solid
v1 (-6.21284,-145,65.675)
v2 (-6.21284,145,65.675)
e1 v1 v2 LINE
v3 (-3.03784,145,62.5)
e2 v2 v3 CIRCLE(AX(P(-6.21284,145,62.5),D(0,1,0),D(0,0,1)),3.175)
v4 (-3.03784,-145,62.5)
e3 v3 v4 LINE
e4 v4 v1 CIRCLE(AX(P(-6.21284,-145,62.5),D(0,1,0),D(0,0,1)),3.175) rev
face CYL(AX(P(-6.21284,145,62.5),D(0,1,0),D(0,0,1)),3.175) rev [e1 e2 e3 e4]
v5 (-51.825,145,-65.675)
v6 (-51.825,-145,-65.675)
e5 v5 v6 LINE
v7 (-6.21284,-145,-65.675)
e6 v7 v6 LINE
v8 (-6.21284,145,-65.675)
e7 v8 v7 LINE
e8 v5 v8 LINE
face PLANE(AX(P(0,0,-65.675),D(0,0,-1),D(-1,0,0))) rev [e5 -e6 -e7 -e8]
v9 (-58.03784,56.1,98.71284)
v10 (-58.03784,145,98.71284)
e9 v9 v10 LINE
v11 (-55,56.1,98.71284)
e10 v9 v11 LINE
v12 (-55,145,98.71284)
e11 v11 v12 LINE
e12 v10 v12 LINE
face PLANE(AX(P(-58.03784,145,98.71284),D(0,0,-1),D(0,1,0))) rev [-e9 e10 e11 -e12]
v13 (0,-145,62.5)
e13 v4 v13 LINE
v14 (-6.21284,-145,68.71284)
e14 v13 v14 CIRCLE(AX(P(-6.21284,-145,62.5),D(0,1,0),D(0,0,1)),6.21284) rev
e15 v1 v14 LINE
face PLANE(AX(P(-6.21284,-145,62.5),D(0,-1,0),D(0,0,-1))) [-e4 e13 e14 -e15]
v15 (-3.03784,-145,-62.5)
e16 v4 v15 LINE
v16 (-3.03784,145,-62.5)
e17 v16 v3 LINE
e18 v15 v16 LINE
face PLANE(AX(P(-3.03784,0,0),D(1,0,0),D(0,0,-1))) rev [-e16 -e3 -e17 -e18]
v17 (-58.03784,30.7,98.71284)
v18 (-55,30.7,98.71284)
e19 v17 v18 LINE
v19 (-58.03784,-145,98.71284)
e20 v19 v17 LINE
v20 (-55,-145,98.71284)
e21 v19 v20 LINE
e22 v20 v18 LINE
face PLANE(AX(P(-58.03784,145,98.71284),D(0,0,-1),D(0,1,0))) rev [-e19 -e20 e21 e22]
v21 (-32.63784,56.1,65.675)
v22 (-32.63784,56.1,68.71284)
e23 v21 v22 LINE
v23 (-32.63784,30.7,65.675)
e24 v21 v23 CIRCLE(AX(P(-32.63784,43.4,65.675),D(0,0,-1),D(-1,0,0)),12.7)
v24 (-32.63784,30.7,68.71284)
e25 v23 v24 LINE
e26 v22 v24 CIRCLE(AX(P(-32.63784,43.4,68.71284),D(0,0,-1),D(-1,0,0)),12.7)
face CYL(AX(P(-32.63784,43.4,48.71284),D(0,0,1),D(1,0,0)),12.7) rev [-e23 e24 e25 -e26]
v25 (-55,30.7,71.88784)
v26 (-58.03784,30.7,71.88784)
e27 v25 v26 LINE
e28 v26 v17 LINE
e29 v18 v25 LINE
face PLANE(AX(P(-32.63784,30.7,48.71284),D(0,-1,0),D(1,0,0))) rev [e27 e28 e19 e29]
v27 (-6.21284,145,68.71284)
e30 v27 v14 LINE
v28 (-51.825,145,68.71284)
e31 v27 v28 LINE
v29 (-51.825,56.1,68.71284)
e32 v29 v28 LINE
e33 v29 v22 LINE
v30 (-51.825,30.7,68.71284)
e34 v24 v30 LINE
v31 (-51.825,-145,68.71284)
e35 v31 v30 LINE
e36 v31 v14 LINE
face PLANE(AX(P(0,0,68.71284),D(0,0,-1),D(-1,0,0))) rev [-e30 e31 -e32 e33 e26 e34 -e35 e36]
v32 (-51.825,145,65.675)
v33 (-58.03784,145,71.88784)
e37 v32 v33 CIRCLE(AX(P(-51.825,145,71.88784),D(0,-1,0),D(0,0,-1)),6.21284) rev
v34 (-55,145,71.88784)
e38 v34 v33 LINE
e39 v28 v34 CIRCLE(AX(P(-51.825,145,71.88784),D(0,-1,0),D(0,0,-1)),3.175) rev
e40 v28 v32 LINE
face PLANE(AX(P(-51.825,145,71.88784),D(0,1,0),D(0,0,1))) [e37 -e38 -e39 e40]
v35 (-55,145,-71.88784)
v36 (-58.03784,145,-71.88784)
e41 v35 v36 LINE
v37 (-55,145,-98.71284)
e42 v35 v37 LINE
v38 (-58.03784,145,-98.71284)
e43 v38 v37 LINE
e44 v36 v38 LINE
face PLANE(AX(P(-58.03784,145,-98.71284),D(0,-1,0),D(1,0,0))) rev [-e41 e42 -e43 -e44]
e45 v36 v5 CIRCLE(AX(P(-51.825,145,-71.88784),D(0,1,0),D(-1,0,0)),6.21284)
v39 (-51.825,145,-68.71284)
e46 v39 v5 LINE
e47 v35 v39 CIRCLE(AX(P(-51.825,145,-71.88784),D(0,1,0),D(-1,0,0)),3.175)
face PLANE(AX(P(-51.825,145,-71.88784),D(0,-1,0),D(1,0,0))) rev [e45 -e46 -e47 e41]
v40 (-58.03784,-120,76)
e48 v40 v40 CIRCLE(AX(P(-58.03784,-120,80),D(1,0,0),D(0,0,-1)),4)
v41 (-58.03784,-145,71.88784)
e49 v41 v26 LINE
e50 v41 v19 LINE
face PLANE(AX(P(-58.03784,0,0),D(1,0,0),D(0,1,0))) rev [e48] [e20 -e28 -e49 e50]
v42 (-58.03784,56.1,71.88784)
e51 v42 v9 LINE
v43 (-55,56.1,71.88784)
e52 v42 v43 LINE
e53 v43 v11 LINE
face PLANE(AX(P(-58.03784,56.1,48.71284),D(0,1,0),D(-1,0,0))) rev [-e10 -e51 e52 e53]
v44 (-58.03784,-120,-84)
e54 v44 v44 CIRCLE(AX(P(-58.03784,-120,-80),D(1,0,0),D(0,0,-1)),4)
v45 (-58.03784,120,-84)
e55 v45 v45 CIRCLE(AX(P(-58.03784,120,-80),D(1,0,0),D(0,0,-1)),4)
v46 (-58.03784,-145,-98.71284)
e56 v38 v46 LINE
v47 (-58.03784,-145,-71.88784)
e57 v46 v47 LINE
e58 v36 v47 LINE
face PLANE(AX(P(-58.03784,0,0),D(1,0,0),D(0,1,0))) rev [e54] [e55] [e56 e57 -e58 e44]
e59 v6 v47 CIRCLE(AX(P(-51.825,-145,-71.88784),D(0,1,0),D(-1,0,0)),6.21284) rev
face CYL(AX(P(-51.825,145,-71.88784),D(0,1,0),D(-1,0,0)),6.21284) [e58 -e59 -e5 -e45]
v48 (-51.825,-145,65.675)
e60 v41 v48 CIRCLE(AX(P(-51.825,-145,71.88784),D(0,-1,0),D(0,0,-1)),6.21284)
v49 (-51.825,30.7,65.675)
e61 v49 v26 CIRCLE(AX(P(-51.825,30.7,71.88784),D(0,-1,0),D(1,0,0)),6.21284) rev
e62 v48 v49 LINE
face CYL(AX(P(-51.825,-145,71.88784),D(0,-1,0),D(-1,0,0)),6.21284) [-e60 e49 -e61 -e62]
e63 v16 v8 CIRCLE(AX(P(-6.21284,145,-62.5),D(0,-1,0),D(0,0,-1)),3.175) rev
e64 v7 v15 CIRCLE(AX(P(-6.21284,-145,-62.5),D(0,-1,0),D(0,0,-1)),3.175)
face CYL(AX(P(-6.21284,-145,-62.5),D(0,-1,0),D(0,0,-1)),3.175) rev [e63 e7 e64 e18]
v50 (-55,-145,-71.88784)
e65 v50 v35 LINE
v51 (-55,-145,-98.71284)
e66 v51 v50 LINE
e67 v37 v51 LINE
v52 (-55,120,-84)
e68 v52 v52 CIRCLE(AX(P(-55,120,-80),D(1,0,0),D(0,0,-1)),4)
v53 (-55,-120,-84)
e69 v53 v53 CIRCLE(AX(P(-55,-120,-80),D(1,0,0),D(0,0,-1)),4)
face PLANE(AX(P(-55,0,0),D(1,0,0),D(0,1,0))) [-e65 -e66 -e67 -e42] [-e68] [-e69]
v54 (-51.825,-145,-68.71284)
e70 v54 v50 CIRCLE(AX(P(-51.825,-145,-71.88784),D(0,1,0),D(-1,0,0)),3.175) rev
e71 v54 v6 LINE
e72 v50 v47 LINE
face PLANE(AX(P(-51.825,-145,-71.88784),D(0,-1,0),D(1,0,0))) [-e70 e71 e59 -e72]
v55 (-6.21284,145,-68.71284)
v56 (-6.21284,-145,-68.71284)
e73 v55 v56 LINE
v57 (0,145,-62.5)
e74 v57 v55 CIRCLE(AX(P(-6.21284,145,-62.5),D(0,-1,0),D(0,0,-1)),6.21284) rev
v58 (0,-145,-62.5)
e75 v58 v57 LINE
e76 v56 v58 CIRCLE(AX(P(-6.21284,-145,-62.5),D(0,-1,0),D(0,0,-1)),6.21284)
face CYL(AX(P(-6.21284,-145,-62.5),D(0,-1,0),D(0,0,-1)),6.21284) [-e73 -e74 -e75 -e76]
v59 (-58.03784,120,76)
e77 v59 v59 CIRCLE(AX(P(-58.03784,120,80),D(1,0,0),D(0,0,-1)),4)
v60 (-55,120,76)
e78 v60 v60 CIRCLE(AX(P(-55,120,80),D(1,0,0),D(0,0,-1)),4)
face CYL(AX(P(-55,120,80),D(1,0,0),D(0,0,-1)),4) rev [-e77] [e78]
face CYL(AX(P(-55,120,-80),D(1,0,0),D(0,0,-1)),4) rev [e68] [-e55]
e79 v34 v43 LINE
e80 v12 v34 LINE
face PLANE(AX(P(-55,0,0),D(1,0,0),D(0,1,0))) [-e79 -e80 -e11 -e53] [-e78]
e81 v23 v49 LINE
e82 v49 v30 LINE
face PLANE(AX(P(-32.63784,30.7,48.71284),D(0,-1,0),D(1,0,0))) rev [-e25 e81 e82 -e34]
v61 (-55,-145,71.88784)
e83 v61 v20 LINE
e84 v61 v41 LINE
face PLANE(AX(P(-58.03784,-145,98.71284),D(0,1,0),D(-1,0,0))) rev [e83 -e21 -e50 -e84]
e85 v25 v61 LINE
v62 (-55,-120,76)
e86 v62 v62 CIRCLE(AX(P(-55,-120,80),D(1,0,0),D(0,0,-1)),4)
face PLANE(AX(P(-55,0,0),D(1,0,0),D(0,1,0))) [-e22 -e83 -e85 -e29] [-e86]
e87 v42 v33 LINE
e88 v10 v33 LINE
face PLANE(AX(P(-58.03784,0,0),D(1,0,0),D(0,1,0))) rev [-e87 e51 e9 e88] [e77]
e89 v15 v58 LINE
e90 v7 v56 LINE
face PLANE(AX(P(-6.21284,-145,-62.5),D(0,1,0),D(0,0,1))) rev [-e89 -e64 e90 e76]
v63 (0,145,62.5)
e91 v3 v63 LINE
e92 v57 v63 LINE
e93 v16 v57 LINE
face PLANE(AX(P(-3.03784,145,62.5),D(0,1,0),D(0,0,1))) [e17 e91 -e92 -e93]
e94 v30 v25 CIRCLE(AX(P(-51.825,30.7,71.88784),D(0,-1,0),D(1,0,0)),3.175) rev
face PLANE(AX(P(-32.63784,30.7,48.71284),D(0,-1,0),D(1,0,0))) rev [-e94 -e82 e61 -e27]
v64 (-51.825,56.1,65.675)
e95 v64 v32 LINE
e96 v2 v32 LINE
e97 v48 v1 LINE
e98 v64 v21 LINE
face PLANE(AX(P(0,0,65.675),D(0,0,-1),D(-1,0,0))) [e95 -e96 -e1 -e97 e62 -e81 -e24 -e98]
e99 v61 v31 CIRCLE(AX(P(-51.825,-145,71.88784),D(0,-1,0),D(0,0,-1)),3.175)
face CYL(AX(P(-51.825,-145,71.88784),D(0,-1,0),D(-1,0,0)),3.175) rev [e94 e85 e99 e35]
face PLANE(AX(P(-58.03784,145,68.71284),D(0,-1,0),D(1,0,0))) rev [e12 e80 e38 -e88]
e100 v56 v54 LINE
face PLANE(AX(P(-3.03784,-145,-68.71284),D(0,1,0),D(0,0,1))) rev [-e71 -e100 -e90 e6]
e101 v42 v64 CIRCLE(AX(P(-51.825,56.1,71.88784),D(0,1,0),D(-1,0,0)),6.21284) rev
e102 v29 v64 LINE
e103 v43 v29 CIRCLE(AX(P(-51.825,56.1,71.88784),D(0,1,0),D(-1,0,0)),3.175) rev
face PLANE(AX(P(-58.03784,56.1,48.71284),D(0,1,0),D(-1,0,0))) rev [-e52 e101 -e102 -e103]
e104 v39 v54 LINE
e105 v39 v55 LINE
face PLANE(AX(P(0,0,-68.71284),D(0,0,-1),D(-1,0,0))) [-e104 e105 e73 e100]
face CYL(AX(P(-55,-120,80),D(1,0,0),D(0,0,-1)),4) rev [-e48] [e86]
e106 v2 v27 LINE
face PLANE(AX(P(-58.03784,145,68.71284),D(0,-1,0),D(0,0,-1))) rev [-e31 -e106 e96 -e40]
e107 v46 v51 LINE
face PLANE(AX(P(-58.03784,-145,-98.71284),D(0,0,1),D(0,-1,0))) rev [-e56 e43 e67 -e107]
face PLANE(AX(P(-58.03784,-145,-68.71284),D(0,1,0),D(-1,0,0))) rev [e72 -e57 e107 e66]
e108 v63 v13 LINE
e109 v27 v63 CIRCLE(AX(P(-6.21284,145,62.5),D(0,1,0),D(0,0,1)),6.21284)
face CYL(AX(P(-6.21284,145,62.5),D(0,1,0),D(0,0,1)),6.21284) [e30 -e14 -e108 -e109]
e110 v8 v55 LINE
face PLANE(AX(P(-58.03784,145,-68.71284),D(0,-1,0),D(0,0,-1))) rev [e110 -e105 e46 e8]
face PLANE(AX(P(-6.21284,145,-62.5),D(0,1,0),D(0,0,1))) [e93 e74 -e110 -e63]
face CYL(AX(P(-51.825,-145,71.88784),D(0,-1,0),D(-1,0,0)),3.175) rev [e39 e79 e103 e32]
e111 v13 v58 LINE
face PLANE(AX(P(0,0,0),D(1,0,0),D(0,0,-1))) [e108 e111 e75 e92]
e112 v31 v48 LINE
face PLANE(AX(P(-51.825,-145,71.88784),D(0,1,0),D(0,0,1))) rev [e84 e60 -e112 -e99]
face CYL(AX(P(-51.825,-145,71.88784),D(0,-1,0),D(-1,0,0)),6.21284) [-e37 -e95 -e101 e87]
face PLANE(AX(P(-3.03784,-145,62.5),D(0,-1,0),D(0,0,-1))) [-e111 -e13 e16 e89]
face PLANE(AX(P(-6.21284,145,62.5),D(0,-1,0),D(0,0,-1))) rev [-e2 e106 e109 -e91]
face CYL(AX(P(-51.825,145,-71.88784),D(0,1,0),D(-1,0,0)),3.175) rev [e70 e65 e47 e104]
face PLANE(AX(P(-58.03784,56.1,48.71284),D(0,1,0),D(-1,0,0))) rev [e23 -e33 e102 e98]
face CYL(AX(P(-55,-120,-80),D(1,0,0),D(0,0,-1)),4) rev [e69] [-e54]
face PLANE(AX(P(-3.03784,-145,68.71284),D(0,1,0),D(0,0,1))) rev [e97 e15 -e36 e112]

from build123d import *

# Parameters (mm, degrees)
SKETCH1_W                      = 125
SKETCH1_H                      = 290
BASE_FLANGE1_DEPTH             = 3.03784
EDGE_FLANGE1_DEPTH             = 290
EDGE_FLANGE1_BEND_DEPTH        = 290
EDGE_FLANGE2_STRIP_W           = 18.50136
EDGE_FLANGE2_STRIP_H           = 3.03784
EDGE_FLANGE2_STRIP_CUT_DEPTH   = 290
EDGE_FLANGE2_STRIP_2_W         = 18.50136
EDGE_FLANGE2_STRIP_2_H         = 3.03784
EDGE_FLANGE2_STRIP_CUT_2_DEPTH = 290
EDGE_FLANGE2_DEPTH             = 290
EDGE_FLANGE2_BEND_DEPTH        = 290
M6_CLEARANCE_HOLE1_D           = 8
CUT_EXTRUDE1_DEPTH             = 50


# Sheet-metal steps are written as plain solids
with BuildPart() as part:
    # Sketch1 → Base-Flange1 (new body)
    with BuildSketch(Plane(origin=(0, 0, 0), x_dir=(0, 0, -1), z_dir=(1, 0, 0))):
        Rectangle(SKETCH1_W, SKETCH1_H)
    extrude(amount=-BASE_FLANGE1_DEPTH)

    # Edge-Flange1 section (across the edge) → Edge-Flange1 (add)
    with BuildSketch(Plane(origin=(-3.03784, -145, 65.675), x_dir=(0, 0, -1), z_dir=(0, 1, 0))):
        with BuildLine():
            Line((-3.03784, 3.175), (-3.03784, 55))
            Line((-3.03784, 55), (0, 55))
            Line((0, 55), (0, 3.175))
            ThreePointArc((0, 3.175), (0.92993597, 0.92993597), (3.175, 0))
            Line((3.175, 0), (3.175, -3.03784))
            ThreePointArc((3.175, -3.03784), (-1.218141294, -1.218141294), (-3.03784, 3.175))
        make_face()
    extrude(amount=EDGE_FLANGE1_DEPTH)

    # Edge-Flange1 section 2 (across the edge) → Edge-Flange1 bend (add)
    with BuildSketch(Plane(origin=(-3.03784, 145, -65.675), x_dir=(0, 0, 1), z_dir=(0, -1, 0))):
        with BuildLine():
            Line((-3.03784, 3.175), (-3.03784, 55))
            Line((-3.03784, 55), (0, 55))
            Line((0, 55), (0, 3.175))
            ThreePointArc((0, 3.175), (0.92993597, 0.92993597), (3.175, 0))
            Line((3.175, 0), (3.175, -3.03784))
            ThreePointArc((3.175, -3.03784), (-1.218141294, -1.218141294), (-3.03784, 3.175))
        make_face()
    extrude(amount=EDGE_FLANGE1_BEND_DEPTH)

    # Edge-Flange2 strip (across the edge) → Edge-Flange2 strip cut (cut)
    with BuildSketch(Plane(origin=(-58.03784, -145, -68.71284), x_dir=(1, 0, 0), z_dir=(0, 1, 0))):
        with Locations((-3.03784, -1.51892)):
            Rectangle(EDGE_FLANGE2_STRIP_W, EDGE_FLANGE2_STRIP_H)
    extrude(amount=EDGE_FLANGE2_STRIP_CUT_DEPTH, mode=Mode.SUBTRACT)

    # Edge-Flange2 strip 2 (across the edge) → Edge-Flange2 strip cut 2 (cut)
    with BuildSketch(Plane(origin=(-58.03784, 145, 68.71284), x_dir=(1, 0, 0), z_dir=(0, -1, 0))):
        with Locations((-3.03784, -1.51892)):
            Rectangle(EDGE_FLANGE2_STRIP_2_W, EDGE_FLANGE2_STRIP_2_H)
    extrude(amount=EDGE_FLANGE2_STRIP_CUT_2_DEPTH, mode=Mode.SUBTRACT)

    # Edge-Flange2 section (across the edge) → Edge-Flange2 (add)
    with BuildSketch(Plane(origin=(-58.03784, -145, -68.71284), x_dir=(1, 0, 0), z_dir=(0, 1, 0))):
        with BuildLine():
            Line((0, 3.175), (0, 30))
            Line((0, 30), (3.03784, 30))
            Line((3.03784, 30), (3.03784, 3.175))
            ThreePointArc((3.03784, 3.175), (3.96777597, 0.92993597), (6.21284, 0))
            Line((6.21284, 0), (6.21284, -3.03784))
            ThreePointArc((6.21284, -3.03784), (1.819698706, -1.218141294), (0, 3.175))
        make_face()
    extrude(amount=EDGE_FLANGE2_DEPTH)

    # Edge-Flange2 section 2 (across the edge) → Edge-Flange2 bend (add)
    with BuildSketch(Plane(origin=(-58.03784, 145, 68.71284), x_dir=(1, 0, 0), z_dir=(0, -1, 0))):
        with BuildLine():
            Line((0, 3.175), (0, 30))
            Line((0, 30), (3.03784, 30))
            Line((3.03784, 30), (3.03784, 3.175))
            ThreePointArc((3.03784, 3.175), (3.96777597, 0.92993597), (6.21284, 0))
            Line((6.21284, 0), (6.21284, -3.03784))
            ThreePointArc((6.21284, -3.03784), (1.819698706, -1.218141294), (0, 3.175))
        make_face()
    extrude(amount=EDGE_FLANGE2_BEND_DEPTH)

    # M6 Clearance Hole1 (through all)
    with Locations(Plane(origin=(-55, 0, 0), x_dir=(0, 0, -1), z_dir=(1, 0, 0))):
        with Locations((-80, 120), (80, 120), (80, -120), (-80, -120)):
            Hole(M6_CLEARANCE_HOLE1_D / 2)

    # Sketch20 → Cut-Extrude1 (cut)
    with BuildSketch(Plane.XY.offset(98.71284)):
        with BuildLine():
            Line((-58.03784, 56.1), (-32.63784, 56.1))
            ThreePointArc((-32.63784, 56.1), (-19.93784, 43.4), (-32.63784, 30.7))
            Line((-32.63784, 30.7), (-58.03784, 30.7))
            Line((-58.03784, 30.7), (-58.03784, 56.1))
        make_face()
    extrude(amount=-CUT_EXTRUDE1_DEPTH, mode=Mode.SUBTRACT)


solid = part.part
